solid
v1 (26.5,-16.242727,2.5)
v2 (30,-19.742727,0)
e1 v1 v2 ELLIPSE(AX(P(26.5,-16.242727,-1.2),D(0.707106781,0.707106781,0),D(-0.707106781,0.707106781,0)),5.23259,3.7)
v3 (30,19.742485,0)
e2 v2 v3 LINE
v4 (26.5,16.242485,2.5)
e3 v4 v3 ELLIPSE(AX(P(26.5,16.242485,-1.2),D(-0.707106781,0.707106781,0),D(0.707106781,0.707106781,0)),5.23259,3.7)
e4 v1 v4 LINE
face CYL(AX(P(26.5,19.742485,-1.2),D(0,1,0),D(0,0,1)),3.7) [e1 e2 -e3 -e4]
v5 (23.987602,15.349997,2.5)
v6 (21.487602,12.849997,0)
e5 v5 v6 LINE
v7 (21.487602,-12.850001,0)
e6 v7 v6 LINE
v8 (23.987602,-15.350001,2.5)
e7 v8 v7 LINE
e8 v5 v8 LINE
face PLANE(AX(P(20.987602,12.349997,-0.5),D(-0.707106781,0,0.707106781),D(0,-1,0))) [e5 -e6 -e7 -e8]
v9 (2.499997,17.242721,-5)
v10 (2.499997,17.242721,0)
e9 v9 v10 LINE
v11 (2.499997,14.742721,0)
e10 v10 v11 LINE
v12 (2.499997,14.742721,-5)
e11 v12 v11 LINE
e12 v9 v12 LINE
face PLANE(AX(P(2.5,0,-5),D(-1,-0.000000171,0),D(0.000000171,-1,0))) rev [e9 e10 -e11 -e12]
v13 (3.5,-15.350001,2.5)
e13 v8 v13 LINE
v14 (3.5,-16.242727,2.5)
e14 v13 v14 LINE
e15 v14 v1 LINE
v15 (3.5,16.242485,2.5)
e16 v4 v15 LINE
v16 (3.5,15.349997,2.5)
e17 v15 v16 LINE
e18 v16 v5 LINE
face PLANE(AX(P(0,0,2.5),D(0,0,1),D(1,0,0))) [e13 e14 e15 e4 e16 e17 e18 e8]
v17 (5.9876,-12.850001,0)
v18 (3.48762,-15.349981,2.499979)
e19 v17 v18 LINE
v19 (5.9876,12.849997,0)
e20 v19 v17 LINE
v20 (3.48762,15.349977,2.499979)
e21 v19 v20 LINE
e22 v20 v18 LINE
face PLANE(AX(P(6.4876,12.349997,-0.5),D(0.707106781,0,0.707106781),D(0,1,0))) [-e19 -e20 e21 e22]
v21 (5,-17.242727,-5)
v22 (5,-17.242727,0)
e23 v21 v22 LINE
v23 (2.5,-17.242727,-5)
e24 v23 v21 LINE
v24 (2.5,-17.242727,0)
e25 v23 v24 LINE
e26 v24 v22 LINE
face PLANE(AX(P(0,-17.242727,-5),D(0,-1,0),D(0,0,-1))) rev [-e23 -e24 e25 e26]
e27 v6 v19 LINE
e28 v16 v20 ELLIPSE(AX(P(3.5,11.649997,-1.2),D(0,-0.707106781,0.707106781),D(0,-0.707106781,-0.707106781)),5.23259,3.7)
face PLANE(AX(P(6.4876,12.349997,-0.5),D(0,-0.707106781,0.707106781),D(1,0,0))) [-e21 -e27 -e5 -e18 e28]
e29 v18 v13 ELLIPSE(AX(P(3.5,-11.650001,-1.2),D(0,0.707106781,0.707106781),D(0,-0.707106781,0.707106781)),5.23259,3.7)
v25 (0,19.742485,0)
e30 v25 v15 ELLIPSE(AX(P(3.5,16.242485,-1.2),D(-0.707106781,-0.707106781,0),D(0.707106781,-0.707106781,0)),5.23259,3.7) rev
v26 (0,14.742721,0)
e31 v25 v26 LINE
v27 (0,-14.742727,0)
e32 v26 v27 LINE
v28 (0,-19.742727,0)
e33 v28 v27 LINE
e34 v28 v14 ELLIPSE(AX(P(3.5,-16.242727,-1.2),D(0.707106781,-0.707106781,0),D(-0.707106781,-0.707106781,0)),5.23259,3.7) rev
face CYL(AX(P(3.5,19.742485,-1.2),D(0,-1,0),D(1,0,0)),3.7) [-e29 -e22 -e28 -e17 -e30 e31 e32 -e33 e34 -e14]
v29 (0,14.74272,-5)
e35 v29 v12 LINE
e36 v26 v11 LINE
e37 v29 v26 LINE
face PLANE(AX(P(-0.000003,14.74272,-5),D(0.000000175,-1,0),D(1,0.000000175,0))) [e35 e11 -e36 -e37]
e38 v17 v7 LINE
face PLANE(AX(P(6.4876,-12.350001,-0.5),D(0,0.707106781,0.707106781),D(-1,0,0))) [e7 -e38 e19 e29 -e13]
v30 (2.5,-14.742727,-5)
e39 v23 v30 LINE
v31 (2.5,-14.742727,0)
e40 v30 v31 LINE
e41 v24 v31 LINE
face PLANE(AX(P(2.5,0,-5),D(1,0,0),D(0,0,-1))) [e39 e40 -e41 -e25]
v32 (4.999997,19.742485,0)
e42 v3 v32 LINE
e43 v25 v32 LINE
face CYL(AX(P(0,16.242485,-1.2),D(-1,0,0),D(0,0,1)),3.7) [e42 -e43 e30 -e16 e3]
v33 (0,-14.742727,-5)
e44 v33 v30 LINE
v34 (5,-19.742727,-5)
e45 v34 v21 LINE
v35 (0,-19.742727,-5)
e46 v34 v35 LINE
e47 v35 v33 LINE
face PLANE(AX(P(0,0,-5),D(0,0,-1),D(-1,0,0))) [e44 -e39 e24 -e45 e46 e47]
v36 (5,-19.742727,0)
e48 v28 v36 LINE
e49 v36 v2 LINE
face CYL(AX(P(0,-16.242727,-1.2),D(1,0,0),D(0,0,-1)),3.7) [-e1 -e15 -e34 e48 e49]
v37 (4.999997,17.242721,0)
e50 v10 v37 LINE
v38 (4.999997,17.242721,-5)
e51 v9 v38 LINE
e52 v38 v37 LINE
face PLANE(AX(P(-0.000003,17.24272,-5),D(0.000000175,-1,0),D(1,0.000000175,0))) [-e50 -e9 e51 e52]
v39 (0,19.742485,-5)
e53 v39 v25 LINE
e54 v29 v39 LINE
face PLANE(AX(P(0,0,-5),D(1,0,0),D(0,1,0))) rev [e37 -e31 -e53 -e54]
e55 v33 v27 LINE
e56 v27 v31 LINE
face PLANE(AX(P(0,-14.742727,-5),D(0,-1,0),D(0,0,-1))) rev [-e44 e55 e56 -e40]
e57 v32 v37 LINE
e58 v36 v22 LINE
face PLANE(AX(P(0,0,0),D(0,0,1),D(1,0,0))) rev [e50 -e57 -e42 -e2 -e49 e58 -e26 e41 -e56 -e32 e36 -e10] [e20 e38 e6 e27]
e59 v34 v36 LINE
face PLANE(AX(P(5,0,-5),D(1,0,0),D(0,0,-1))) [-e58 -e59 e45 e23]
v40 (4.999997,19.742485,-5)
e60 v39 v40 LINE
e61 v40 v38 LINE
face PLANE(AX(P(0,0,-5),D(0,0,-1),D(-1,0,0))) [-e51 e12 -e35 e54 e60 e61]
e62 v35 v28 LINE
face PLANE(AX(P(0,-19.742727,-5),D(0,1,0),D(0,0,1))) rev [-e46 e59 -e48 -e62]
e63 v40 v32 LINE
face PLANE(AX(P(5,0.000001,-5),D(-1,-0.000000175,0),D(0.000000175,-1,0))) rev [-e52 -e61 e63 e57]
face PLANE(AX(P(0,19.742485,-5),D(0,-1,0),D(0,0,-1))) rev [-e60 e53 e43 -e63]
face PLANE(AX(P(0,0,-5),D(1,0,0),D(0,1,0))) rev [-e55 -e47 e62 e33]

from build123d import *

# Parameters (mm, degrees)
SKETCH1_W           = 30
SKETCH1_H           = 39.485211854
BOSS_EXTRUDE1_DEPTH = 2.5
SKETCH2_W           = 14.50000216
SKETCH2_H           = 24.699998732
CUT_EXTRUDE1_DEPTH  = 37.000350752
CHAMFER2_SIZE       = 3
FILLET5_R           = 3.7
BOSS_EXTRUDE2_DEPTH = 5


with BuildPart() as part:
    # Sketch1 → Boss-Extrude1 (new body)
    with BuildSketch(Plane.XY):
        with Locations((15.000000036, -0.000120634)):
            Rectangle(SKETCH1_W, SKETCH1_H)
    extrude(amount=BOSS_EXTRUDE1_DEPTH)

    # Sketch2 → Cut-Extrude1 (cut, through all)
    with BuildSketch(Plane.XY.offset(2.5)):
        with Locations((13.737600789, -1.949e-06)):
            Rectangle(SKETCH2_W, SKETCH2_H)
    extrude(amount=-CUT_EXTRUDE1_DEPTH, mode=Mode.SUBTRACT)

    # Chamfer2
    # the kernel refuses this chamfer: 3 mm, written as the material it takes off along each edge
    with BuildSketch(Plane(origin=(20.987601869, -12.350001315, 2.5), x_dir=(0, -1, 0), z_dir=(-1, 0, 0)), Plane(origin=(6.487599709, 12.349997417, 2.5), x_dir=(0, 1, 0), z_dir=(1, 0, 0))) as chamfer2_piece_1:
        Polygon((CHAMFER2_SIZE, 0), (0, -CHAMFER2_SIZE), (0, 0), align=None)
    extrude(amount=14.500002159, mode=Mode.SUBTRACT)
    with BuildSketch(Plane(origin=(20.987601869, 12.349997417, 2.5), x_dir=(1, 0, 0), z_dir=(0, -1, 0)), Plane(origin=(6.487599709, -12.350001315, 2.5), x_dir=(-1, 0, 0), z_dir=(0, 1, 0))) as chamfer2_piece_2:
        Polygon((CHAMFER2_SIZE, 0), (0, -CHAMFER2_SIZE), (0, 0), align=None)
    extrude(amount=24.699998732, mode=Mode.SUBTRACT)
    with BuildSketch(Plane(origin=(20.987601869, 12.349997417, 2.5), x_dir=(1, 0, 0), z_dir=(0, -1, 0))) as chamfer2_piece_3a_section:
        Polygon((CHAMFER2_SIZE, 0), (0, -CHAMFER2_SIZE), (0, 0), align=None)
    chamfer2_piece_3a = extrude(amount=32.415047696, mode=Mode.PRIVATE)
    chamfer2_piece_3a = split(chamfer2_piece_3a, bisect_by=Plane(origin=(20.987601869, -12.350001315, 2.5), z_dir=(0, -1, 0)), keep=Keep.TOP, mode=Mode.PRIVATE)
    with BuildSketch(Plane(origin=(28.702650833, -12.350001315, 2.5), x_dir=(0, -1, 0), z_dir=(-1, 0, 0))) as chamfer2_piece_3b_section:
        Polygon((CHAMFER2_SIZE, 0), (0, -CHAMFER2_SIZE), (0, 0), align=None)
    chamfer2_piece_3b = extrude(amount=22.215051123, mode=Mode.PRIVATE)
    chamfer2_piece_3b = split(chamfer2_piece_3b, bisect_by=Plane(origin=(20.987601869, -12.350001315, 2.5), z_dir=(1, 0, 0)), keep=Keep.TOP, mode=Mode.PRIVATE)
    chamfer2_piece_3 = chamfer2_piece_3a & chamfer2_piece_3b
    add(chamfer2_piece_3, mode=Mode.SUBTRACT)
    with BuildSketch(Plane(origin=(20.987601869, -12.350001315, 2.5), x_dir=(0, -1, 0), z_dir=(-1, 0, 0))) as chamfer2_piece_4a_section:
        Polygon((CHAMFER2_SIZE, 0), (0, -CHAMFER2_SIZE), (0, 0), align=None)
    chamfer2_piece_4a = extrude(amount=22.215051123, mode=Mode.PRIVATE)
    chamfer2_piece_4a = split(chamfer2_piece_4a, bisect_by=Plane(origin=(6.487599709, -12.350001315, 2.5), z_dir=(-1, 0, 0)), keep=Keep.TOP, mode=Mode.PRIVATE)
    with BuildSketch(Plane(origin=(6.487599709, -20.065050279, 2.5), x_dir=(-1, 0, 0), z_dir=(0, 1, 0))) as chamfer2_piece_4b_section:
        Polygon((CHAMFER2_SIZE, 0), (0, -CHAMFER2_SIZE), (0, 0), align=None)
    chamfer2_piece_4b = extrude(amount=32.415047696, mode=Mode.PRIVATE)
    chamfer2_piece_4b = split(chamfer2_piece_4b, bisect_by=Plane(origin=(6.487599709, -12.350001315, 2.5), z_dir=(0, -1, 0)), keep=Keep.TOP, mode=Mode.PRIVATE)
    chamfer2_piece_4 = chamfer2_piece_4a & chamfer2_piece_4b
    add(chamfer2_piece_4, mode=Mode.SUBTRACT)
    with BuildSketch(Plane(origin=(6.487599709, 12.349997417, 2.5), x_dir=(0, 1, 0), z_dir=(1, 0, 0))) as chamfer2_piece_5a_section:
        Polygon((CHAMFER2_SIZE, 0), (0, -CHAMFER2_SIZE), (0, 0), align=None)
    chamfer2_piece_5a = extrude(amount=22.215051123, mode=Mode.PRIVATE)
    chamfer2_piece_5a = split(chamfer2_piece_5a, bisect_by=Plane(origin=(20.987601869, 12.349997417, 2.5), z_dir=(1, 0, 0)), keep=Keep.TOP, mode=Mode.PRIVATE)
    with BuildSketch(Plane(origin=(20.987601869, 20.065046381, 2.5), x_dir=(1, 0, 0), z_dir=(0, -1, 0))) as chamfer2_piece_5b_section:
        Polygon((CHAMFER2_SIZE, 0), (0, -CHAMFER2_SIZE), (0, 0), align=None)
    chamfer2_piece_5b = extrude(amount=32.415047696, mode=Mode.PRIVATE)
    chamfer2_piece_5b = split(chamfer2_piece_5b, bisect_by=Plane(origin=(20.987601869, 12.349997417, 2.5), z_dir=(0, 1, 0)), keep=Keep.TOP, mode=Mode.PRIVATE)
    chamfer2_piece_5 = chamfer2_piece_5a & chamfer2_piece_5b
    add(chamfer2_piece_5, mode=Mode.SUBTRACT)
    with BuildSketch(Plane(origin=(-1.227449254, 12.349997417, 2.5), x_dir=(0, 1, 0), z_dir=(1, 0, 0))) as chamfer2_piece_6a_section:
        Polygon((CHAMFER2_SIZE, 0), (0, -CHAMFER2_SIZE), (0, 0), align=None)
    chamfer2_piece_6a = extrude(amount=22.215051123, mode=Mode.PRIVATE)
    chamfer2_piece_6a = split(chamfer2_piece_6a, bisect_by=Plane(origin=(6.487599709, 12.349997417, 2.5), z_dir=(-1, 0, 0)), keep=Keep.TOP, mode=Mode.PRIVATE)
    with BuildSketch(Plane(origin=(6.487599709, -12.350001315, 2.5), x_dir=(-1, 0, 0), z_dir=(0, 1, 0))) as chamfer2_piece_6b_section:
        Polygon((CHAMFER2_SIZE, 0), (0, -CHAMFER2_SIZE), (0, 0), align=None)
    chamfer2_piece_6b = extrude(amount=32.415047696, mode=Mode.PRIVATE)
    chamfer2_piece_6b = split(chamfer2_piece_6b, bisect_by=Plane(origin=(6.487599709, 12.349997417, 2.5), z_dir=(0, 1, 0)), keep=Keep.TOP, mode=Mode.PRIVATE)
    chamfer2_piece_6 = chamfer2_piece_6a & chamfer2_piece_6b
    add(chamfer2_piece_6, mode=Mode.SUBTRACT)

    # Fillet5
    # the kernel refuses this fillet: 3.7 mm, written as the material it takes off along each edge
    with BuildSketch(Plane(origin=(-8.749999964, 19.742485293, 2.5), x_dir=(0, 0, -1), z_dir=(1, 0, 0))) as fillet5_piece_1:
        with BuildLine():
            CenterArc((3.7, -3.5), FILLET5_R, 108.924644416, 71.075355584)
            Line((0, -3.5), (0, 0))
            Line((0, 0), (2.5, 0))
        make_face()
    extrude(amount=47.5, mode=Mode.SUBTRACT)
    with BuildSketch(Plane(origin=(38.750000036, -19.742726561, 2.5), x_dir=(0, 1, 0), z_dir=(-1, 0, 0))) as fillet5_piece_2:
        with BuildLine():
            CenterArc((3.5, 3.7), FILLET5_R, 198.924644416, 71.075355584)
            Line((0, 2.5), (0, 0))
            Line((0, 0), (3.5, 0))
        make_face()
    extrude(amount=47.5, mode=Mode.SUBTRACT)
    with BuildSketch(Plane(origin=(3.6e-08, -28.492726561, 2.5), x_dir=(1, 0, 0), z_dir=(0, 1, 0)), Plane(origin=(30.000000036, 28.492485293, 2.5), x_dir=(-1, 0, 0), z_dir=(0, -1, 0))) as fillet5_piece_3:
        with BuildLine():
            CenterArc((3.5, 3.7), FILLET5_R, 198.924644416, 71.075355584)
            Line((0, 2.5), (0, 0))
            Line((0, 0), (3.5, 0))
        make_face()
    extrude(amount=56.985211855, mode=Mode.SUBTRACT)

    # Sketch5 → Boss-Extrude2 (add)
    with BuildSketch(Plane(origin=(0, 0, 0), x_dir=(-1, 0, 0), z_dir=(0, 0, -1))):
        Polygon((-3.6e-08, -19.742726561), (-5.000000036, -19.742726561), (-5.000000036, -17.242726561), (-2.5, -17.242726561), (-2.5, -14.742726561), (0, -14.742726561), align=None)
        Polygon((-2.499996996, 17.242720698), (-4.999997021, 17.242721136), (-4.999996584, 19.742721136), (3.416e-06, 19.742720261), (2.578e-06, 14.742720261), (-2.499997422, 14.742720698), align=None)
    extrude(amount=BOSS_EXTRUDE2_DEPTH)


solid = part.part
